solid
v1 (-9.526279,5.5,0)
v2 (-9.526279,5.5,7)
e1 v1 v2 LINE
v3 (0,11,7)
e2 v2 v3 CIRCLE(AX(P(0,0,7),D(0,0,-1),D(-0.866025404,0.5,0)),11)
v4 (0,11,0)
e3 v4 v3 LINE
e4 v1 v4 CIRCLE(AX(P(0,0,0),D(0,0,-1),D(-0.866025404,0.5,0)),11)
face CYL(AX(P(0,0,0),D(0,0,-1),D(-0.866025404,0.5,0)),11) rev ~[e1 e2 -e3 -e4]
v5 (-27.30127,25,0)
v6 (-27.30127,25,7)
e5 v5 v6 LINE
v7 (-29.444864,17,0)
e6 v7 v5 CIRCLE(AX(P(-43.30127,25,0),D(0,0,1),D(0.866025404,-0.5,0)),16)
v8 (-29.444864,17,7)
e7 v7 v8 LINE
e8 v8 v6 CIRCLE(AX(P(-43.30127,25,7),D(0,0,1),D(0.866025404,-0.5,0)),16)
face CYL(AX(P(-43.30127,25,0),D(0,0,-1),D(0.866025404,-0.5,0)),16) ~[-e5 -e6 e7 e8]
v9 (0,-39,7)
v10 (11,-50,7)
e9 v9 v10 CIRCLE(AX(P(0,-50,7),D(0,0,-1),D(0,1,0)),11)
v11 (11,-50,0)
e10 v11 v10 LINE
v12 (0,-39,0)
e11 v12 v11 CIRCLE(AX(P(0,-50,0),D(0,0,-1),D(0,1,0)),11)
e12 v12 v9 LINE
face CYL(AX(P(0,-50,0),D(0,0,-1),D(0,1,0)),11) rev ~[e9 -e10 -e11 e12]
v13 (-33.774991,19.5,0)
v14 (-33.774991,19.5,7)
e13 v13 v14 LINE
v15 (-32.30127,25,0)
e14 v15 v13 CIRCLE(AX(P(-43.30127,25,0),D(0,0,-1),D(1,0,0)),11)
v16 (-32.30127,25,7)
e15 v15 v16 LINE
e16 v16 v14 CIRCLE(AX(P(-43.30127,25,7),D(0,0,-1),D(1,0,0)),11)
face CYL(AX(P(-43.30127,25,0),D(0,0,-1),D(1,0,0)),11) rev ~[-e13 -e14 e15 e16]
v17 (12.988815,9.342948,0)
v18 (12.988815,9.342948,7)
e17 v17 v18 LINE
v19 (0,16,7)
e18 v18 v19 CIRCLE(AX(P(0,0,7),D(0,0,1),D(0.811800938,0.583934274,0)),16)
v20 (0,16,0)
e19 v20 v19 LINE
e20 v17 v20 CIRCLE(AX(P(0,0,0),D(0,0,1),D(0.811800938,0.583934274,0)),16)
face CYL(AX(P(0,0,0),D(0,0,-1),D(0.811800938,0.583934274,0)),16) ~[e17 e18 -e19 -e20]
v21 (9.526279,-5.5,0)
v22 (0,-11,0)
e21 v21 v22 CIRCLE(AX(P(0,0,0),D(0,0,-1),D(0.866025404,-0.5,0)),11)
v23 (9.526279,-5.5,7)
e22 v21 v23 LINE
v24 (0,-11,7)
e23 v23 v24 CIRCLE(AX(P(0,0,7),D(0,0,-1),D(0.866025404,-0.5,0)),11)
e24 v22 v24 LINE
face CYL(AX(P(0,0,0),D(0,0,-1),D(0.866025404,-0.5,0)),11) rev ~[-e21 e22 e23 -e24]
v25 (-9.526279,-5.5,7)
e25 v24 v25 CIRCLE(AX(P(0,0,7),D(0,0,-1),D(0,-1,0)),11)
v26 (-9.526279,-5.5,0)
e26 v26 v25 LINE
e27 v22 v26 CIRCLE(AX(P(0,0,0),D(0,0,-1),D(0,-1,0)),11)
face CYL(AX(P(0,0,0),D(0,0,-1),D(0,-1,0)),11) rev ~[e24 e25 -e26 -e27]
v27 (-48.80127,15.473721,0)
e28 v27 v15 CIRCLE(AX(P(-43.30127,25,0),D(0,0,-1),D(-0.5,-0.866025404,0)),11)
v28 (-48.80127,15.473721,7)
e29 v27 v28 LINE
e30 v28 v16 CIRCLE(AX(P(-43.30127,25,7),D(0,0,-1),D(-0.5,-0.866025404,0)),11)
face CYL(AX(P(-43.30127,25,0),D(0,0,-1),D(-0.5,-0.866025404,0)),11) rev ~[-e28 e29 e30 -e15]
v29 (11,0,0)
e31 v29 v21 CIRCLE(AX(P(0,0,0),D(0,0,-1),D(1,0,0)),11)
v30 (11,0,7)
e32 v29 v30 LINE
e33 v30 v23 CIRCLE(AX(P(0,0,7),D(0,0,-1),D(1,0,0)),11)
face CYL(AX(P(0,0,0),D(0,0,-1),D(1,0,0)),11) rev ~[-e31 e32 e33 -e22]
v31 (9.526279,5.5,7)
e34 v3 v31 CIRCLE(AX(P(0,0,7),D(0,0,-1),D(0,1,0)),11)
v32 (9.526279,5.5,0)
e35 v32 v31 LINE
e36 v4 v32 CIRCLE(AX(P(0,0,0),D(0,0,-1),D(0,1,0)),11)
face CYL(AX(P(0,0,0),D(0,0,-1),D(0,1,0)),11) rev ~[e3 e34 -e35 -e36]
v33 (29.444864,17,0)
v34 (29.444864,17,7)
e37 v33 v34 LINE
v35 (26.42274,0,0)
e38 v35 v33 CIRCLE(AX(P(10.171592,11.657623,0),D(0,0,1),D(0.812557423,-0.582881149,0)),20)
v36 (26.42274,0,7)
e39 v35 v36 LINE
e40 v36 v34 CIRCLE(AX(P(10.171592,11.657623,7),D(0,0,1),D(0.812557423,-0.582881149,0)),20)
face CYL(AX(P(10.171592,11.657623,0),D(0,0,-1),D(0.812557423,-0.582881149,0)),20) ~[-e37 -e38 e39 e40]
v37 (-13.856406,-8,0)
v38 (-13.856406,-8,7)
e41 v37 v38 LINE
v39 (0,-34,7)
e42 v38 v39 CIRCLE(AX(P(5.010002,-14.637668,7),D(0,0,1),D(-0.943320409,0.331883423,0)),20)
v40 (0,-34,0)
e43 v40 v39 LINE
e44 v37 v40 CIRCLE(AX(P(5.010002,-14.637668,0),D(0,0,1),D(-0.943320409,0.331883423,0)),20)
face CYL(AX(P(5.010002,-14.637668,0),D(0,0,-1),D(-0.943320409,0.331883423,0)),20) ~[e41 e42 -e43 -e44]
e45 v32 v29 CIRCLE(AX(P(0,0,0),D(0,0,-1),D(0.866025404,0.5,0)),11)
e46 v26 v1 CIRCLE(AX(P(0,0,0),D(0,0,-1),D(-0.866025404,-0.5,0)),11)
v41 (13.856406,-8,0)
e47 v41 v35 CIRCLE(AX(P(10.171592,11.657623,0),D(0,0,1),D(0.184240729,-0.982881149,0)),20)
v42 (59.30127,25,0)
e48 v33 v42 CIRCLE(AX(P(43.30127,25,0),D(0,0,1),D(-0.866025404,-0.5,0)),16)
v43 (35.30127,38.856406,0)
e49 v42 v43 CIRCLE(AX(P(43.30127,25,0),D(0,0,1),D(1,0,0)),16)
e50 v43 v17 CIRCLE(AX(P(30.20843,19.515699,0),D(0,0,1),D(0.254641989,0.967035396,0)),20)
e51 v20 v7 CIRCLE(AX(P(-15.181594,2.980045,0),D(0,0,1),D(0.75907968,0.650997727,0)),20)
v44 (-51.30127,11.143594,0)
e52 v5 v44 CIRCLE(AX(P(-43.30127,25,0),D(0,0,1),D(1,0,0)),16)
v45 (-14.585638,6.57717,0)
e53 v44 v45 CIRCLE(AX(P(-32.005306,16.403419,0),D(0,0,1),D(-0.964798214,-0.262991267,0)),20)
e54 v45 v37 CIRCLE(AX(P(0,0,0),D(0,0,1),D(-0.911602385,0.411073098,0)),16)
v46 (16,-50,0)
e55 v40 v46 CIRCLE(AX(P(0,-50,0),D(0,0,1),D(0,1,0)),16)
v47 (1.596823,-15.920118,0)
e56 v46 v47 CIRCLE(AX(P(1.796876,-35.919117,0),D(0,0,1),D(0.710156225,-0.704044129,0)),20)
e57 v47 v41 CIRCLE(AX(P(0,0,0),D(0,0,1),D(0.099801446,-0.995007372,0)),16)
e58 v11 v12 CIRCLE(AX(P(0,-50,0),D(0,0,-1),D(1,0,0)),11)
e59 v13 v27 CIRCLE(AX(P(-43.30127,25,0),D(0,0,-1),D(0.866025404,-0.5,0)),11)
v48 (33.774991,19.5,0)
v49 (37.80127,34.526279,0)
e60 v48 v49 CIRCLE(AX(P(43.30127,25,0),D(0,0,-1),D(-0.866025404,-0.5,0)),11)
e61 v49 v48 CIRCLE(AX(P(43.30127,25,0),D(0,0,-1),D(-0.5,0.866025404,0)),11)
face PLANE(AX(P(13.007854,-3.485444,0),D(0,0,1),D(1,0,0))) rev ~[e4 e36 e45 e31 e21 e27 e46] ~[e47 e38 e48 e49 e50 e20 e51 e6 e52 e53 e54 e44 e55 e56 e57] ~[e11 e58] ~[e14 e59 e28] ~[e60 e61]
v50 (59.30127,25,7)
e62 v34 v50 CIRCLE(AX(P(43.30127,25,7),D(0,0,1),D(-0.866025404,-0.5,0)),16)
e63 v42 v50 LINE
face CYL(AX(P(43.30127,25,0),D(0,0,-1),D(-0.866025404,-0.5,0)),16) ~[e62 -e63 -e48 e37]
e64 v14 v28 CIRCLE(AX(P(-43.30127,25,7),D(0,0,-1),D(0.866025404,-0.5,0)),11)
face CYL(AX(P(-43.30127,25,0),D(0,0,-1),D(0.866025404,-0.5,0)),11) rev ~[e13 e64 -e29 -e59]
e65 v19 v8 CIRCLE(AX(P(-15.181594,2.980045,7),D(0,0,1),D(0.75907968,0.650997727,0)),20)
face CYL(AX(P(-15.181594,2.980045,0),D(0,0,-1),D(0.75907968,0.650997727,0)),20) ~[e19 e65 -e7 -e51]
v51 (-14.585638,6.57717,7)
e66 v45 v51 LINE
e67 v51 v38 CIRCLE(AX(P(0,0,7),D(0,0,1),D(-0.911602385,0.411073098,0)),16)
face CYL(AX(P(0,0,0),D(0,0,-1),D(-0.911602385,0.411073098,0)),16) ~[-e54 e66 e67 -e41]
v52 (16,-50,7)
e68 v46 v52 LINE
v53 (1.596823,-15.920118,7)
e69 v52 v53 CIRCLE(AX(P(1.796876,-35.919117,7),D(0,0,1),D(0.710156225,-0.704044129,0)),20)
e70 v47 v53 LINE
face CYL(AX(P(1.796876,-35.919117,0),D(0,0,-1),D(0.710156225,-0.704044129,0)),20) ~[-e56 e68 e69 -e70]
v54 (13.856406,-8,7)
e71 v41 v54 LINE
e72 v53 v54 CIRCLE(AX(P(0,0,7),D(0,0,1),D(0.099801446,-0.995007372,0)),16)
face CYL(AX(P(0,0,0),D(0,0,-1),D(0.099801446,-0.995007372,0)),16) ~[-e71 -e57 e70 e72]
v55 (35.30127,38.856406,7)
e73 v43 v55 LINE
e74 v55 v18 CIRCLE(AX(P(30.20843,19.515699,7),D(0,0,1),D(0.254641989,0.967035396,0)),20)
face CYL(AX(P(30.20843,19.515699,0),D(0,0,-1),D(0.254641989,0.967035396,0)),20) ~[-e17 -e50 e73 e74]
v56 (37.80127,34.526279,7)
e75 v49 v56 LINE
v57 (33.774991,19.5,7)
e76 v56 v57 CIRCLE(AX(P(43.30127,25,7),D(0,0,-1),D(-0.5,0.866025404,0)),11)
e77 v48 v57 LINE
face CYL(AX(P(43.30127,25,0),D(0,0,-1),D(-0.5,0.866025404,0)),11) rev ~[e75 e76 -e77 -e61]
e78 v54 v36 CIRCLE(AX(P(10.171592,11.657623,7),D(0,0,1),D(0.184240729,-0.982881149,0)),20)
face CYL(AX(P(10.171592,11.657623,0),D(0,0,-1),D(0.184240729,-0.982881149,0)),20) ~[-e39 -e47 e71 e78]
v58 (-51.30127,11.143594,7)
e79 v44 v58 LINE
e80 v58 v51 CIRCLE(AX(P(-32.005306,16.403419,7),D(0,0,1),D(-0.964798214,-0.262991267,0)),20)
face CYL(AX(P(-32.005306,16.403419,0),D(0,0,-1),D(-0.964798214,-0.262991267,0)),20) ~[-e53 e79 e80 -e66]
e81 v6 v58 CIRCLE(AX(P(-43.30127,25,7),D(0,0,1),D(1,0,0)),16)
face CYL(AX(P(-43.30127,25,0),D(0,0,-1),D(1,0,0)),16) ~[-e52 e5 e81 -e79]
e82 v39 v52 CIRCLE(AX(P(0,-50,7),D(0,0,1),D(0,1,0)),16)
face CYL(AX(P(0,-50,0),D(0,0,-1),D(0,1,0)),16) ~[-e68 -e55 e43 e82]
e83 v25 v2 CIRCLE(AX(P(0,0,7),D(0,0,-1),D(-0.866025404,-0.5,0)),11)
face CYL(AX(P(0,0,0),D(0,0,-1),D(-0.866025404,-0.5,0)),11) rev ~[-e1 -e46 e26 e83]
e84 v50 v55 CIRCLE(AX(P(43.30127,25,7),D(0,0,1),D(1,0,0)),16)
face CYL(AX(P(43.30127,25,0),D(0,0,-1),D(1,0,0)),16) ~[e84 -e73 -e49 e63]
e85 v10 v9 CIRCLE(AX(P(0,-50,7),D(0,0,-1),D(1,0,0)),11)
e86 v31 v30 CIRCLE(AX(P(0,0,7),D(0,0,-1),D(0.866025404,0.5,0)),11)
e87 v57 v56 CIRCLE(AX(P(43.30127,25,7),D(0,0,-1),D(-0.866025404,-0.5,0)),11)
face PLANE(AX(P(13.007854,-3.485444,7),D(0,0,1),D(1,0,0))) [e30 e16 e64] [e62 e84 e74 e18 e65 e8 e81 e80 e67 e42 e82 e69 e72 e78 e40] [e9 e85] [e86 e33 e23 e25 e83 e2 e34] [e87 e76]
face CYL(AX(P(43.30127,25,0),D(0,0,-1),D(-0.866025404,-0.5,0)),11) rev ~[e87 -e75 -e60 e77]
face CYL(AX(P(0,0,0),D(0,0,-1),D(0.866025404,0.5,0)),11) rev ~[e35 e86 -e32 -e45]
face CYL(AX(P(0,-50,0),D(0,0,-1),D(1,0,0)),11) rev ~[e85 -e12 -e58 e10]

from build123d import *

# Parameters (mm, degrees)
F1_DEPTH = 7


# Not quite as in the source:
# - a feature names something its author has since deleted; it is built from what else it names


with BuildPart() as f1:
    # F0 (on Top) → F1 (new body)
    with BuildSketch(Plane.XY):
        with BuildLine():
            Line((16, 0), (11, 0))
            ThreePointArc((11, 0), (10.6251840892, -2.8470094961), (9.5262794416, -5.5))
            Line((9.5262794416, -5.5), (13.8564064606, -8))
            ThreePointArc((13.8564064606, -8), (15.4548132206, -4.1411047216), (16, 0))
        make_face()
        with BuildLine():
            ThreePointArc((9.5262794416, 5.5), (10.6251840892, 2.8470094961), (11, 0))
            Line((11, 0), (16, 0))
            ThreePointArc((16, 0), (15.4548132206, 4.1411047216), (13.8564064606, 8))
            Line((13.8564064606, 8), (9.5262794416, 5.5))
        make_face()
        with BuildLine():
            ThreePointArc((0, 11), (5.5, 9.5262794416), (9.5262794416, 5.5))
            Line((9.5262794416, 5.5), (13.8564064606, 8))
            ThreePointArc((13.8564064606, 8), (13.409185793, 8.6628012124), (12.9888150126, 9.3429483874))
            ThreePointArc((12.9888150126, 9.3429483874), (7.2976991512, 14.2388056767), (0, 16))
            Line((0, 16), (0, 11))
        make_face()
        with BuildLine():
            Line((13.8564064606, -8), (9.5262794416, -5.5))
            ThreePointArc((9.5262794416, -5.5), (5.5, -9.5262794416), (0, -11))
            Line((0, -11), (0, -16))
            ThreePointArc((0, -16), (0.7976130214, -15.944096147), (1.5968231434, -15.9201179596))
            ThreePointArc((1.5968231434, -15.9201179596), (8.68231786, -13.4393956924), (13.8564064606, -8))
        make_face()
        with BuildLine():
            Line((26.4227403385, 0), (16, 0))
            ThreePointArc((16, 0), (15.4548132206, -4.1411047216), (13.8564064606, -8))
            ThreePointArc((13.8564064606, -8), (20.912199664, -5.2136349503), (26.4227403385, 0))
        make_face()
        with BuildLine():
            ThreePointArc((13.8564064606, 8), (15.4548132206, 4.1411047216), (16, 0))
            Line((16, 0), (26.4227403385, 0))
            ThreePointArc((26.4227403385, 0), (29.8628617611, 8.1570672633), (29.4448637287, 17))
            Line((29.4448637287, 17), (13.8564064606, 8))
        make_face()
        with BuildLine():
            ThreePointArc((-9.5262794416, 5.5), (-5.5, 9.5262794416), (0, 11))
            Line((0, 11), (0, 16))
            ThreePointArc((0, 16), (-8, 13.8564064606), (-13.8564064606, 8))
            Line((-13.8564064606, 8), (-9.5262794416, 5.5))
        make_face()
        with BuildLine():
            ThreePointArc((12.9888150126, 9.3429483874), (13.409185793, 8.6628012124), (13.8564064606, 8))
            ThreePointArc((13.8564064606, 8), (13.4393956924, 8.68231786), (12.9888150126, 9.3429483874))
        make_face()
        with BuildLine():
            ThreePointArc((12.9888150126, 9.3429483874), (13.4393956924, 8.68231786), (13.8564064606, 8))
            Line((13.8564064606, 8), (29.4448637287, 17))
            ThreePointArc((29.4448637287, 17), (27.8464569686, 29.1411047216), (35.3012701892, 38.8564064606))
            ThreePointArc((35.3012701892, 38.8564064606), (14.2545680685, 31.576970296), (12.9888150126, 9.3429483874))
        make_face()
        with BuildLine():
            Line((0, -16), (0, -11))
            ThreePointArc((0, -11), (-5.5, -9.5262794416), (-9.5262794416, -5.5))
            Line((-9.5262794416, -5.5), (-13.8564064606, -8))
            ThreePointArc((-13.8564064606, -8), (-8, -13.8564064606), (0, -16))
        make_face()
        with BuildLine():
            ThreePointArc((-9.5262794416, -5.5), (-11, 0), (-9.5262794416, 5.5))
            Line((-9.5262794416, 5.5), (-13.8564064606, 8))
            ThreePointArc((-13.8564064606, 8), (-14.2067988144, 7.2812949346), (-14.585638156, 6.5771695722))
            ThreePointArc((-14.585638156, 6.5771695722), (-15.9800170112, -0.7994099843), (-13.8564064606, -8))
            Line((-13.8564064606, -8), (-9.5262794416, -5.5))
        make_face()
        with BuildLine():
            ThreePointArc((-13.8564064606, 8), (-8, 13.8564064606), (0, 16))
            ThreePointArc((0, 16), (-14.5027493597, 22.9685214121), (-29.4448637287, 17))
            Line((-29.4448637287, 17), (-13.8564064606, 8))
        make_face()
        with BuildLine():
            ThreePointArc((35.3012701892, 38.8564064606), (27.8464569686, 29.1411047216), (29.4448637287, 17))
            Line((29.4448637287, 17), (33.7749907476, 19.5))
            ThreePointArc((33.7749907476, 19.5), (32.6760861, 27.8470094961), (37.8012701892, 34.5262794416))
            Line((37.8012701892, 34.5262794416), (35.3012701892, 38.8564064606))
        make_face()
        with BuildLine():
            Line((33.7749907476, 19.5), (29.4448637287, 17))
            ThreePointArc((29.4448637287, 17), (47.4423749109, 9.5451867794), (59.3012701892, 25))
            ThreePointArc((59.3012701892, 25), (51.3012701892, 38.8564064606), (35.3012701892, 38.8564064606))
            Line((35.3012701892, 38.8564064606), (37.8012701892, 34.5262794416))
            ThreePointArc((37.8012701892, 34.5262794416), (48.8012701892, 34.5262794416), (54.3012701892, 25))
            ThreePointArc((54.3012701892, 25), (46.1482796853, 14.3748159108), (33.7749907476, 19.5))
        make_face()
        with BuildLine():
            Line((0, -34), (0, -16))
            ThreePointArc((0, -16), (-8, -13.8564064606), (-13.8564064606, -8))
            ThreePointArc((-13.8564064606, -8), (-12.6399483504, -24.0440100763), (0, -34))
        make_face()
        with BuildLine():
            ThreePointArc((1.5968231434, -15.9201179596), (0.7976130214, -15.944096147), (0, -16))
            ThreePointArc((0, -16), (0.7994099843, -15.9800170112), (1.5968231434, -15.9201179596))
        make_face()
        with BuildLine():
            ThreePointArc((1.5968231434, -15.9201179596), (0.7994099843, -15.9800170112), (0, -16))
            Line((0, -16), (0, -34))
            ThreePointArc((0, -34), (11.313708499, -38.686291501), (16, -50))
            ThreePointArc((16, -50), (20.2191744167, -28.1333032153), (1.5968231434, -15.9201179596))
        make_face()
        with BuildLine():
            ThreePointArc((-14.585638156, 6.5771695722), (-14.2067988144, 7.2812949346), (-13.8564064606, 8))
            ThreePointArc((-13.8564064606, 8), (-14.2388056767, 7.2976991512), (-14.585638156, 6.5771695722))
        make_face()
        with BuildLine():
            ThreePointArc((-14.585638156, 6.5771695722), (-14.2388056767, 7.2976991512), (-13.8564064606, 8))
            Line((-13.8564064606, 8), (-29.4448637287, 17))
            ThreePointArc((-29.4448637287, 17), (-39.1601654676, 9.5451867794), (-51.3012701892, 11.1435935394))
            ThreePointArc((-51.3012701892, 11.1435935394), (-34.4737424851, -3.4436670807), (-14.585638156, 6.5771695722))
        make_face()
        with BuildLine():
            ThreePointArc((-51.3012701892, 11.1435935394), (-39.1601654676, 9.5451867794), (-29.4448637287, 17))
            Line((-29.4448637287, 17), (-33.7749907476, 19.5))
            ThreePointArc((-33.7749907476, 19.5), (-40.4542606931, 14.3748159108), (-48.8012701892, 15.4737205584))
            Line((-48.8012701892, 15.4737205584), (-51.3012701892, 11.1435935394))
        make_face()
        with BuildLine():
            Line((-33.7749907476, 19.5), (-29.4448637287, 17))
            ThreePointArc((-29.4448637287, 17), (-27.8464569686, 20.8588952784), (-27.3012701892, 25))
            ThreePointArc((-27.3012701892, 25), (-51.3012701892, 38.8564064606), (-51.3012701892, 11.1435935394))
            Line((-51.3012701892, 11.1435935394), (-48.8012701892, 15.4737205584))
            ThreePointArc((-48.8012701892, 15.4737205584), (-48.8012701892, 34.5262794416), (-32.3012701892, 25))
            ThreePointArc((-32.3012701892, 25), (-32.6760861, 22.1529905039), (-33.7749907476, 19.5))
        make_face()
        with BuildLine():
            ThreePointArc((16, -50), (11.313708499, -38.686291501), (0, -34))
            Line((0, -34), (0, -39))
            ThreePointArc((0, -39), (7.7781745931, -42.2218254069), (11, -50))
            Line((11, -50), (16, -50))
        make_face()
        with BuildLine():
            Line((0, -39), (0, -34))
            ThreePointArc((0, -34), (-11.313708499, -61.313708499), (16, -50))
            Line((16, -50), (11, -50))
            ThreePointArc((11, -50), (-7.7781745931, -57.7781745931), (0, -39))
        make_face()
    extrude(amount=F1_DEPTH)


solid = f1.part
